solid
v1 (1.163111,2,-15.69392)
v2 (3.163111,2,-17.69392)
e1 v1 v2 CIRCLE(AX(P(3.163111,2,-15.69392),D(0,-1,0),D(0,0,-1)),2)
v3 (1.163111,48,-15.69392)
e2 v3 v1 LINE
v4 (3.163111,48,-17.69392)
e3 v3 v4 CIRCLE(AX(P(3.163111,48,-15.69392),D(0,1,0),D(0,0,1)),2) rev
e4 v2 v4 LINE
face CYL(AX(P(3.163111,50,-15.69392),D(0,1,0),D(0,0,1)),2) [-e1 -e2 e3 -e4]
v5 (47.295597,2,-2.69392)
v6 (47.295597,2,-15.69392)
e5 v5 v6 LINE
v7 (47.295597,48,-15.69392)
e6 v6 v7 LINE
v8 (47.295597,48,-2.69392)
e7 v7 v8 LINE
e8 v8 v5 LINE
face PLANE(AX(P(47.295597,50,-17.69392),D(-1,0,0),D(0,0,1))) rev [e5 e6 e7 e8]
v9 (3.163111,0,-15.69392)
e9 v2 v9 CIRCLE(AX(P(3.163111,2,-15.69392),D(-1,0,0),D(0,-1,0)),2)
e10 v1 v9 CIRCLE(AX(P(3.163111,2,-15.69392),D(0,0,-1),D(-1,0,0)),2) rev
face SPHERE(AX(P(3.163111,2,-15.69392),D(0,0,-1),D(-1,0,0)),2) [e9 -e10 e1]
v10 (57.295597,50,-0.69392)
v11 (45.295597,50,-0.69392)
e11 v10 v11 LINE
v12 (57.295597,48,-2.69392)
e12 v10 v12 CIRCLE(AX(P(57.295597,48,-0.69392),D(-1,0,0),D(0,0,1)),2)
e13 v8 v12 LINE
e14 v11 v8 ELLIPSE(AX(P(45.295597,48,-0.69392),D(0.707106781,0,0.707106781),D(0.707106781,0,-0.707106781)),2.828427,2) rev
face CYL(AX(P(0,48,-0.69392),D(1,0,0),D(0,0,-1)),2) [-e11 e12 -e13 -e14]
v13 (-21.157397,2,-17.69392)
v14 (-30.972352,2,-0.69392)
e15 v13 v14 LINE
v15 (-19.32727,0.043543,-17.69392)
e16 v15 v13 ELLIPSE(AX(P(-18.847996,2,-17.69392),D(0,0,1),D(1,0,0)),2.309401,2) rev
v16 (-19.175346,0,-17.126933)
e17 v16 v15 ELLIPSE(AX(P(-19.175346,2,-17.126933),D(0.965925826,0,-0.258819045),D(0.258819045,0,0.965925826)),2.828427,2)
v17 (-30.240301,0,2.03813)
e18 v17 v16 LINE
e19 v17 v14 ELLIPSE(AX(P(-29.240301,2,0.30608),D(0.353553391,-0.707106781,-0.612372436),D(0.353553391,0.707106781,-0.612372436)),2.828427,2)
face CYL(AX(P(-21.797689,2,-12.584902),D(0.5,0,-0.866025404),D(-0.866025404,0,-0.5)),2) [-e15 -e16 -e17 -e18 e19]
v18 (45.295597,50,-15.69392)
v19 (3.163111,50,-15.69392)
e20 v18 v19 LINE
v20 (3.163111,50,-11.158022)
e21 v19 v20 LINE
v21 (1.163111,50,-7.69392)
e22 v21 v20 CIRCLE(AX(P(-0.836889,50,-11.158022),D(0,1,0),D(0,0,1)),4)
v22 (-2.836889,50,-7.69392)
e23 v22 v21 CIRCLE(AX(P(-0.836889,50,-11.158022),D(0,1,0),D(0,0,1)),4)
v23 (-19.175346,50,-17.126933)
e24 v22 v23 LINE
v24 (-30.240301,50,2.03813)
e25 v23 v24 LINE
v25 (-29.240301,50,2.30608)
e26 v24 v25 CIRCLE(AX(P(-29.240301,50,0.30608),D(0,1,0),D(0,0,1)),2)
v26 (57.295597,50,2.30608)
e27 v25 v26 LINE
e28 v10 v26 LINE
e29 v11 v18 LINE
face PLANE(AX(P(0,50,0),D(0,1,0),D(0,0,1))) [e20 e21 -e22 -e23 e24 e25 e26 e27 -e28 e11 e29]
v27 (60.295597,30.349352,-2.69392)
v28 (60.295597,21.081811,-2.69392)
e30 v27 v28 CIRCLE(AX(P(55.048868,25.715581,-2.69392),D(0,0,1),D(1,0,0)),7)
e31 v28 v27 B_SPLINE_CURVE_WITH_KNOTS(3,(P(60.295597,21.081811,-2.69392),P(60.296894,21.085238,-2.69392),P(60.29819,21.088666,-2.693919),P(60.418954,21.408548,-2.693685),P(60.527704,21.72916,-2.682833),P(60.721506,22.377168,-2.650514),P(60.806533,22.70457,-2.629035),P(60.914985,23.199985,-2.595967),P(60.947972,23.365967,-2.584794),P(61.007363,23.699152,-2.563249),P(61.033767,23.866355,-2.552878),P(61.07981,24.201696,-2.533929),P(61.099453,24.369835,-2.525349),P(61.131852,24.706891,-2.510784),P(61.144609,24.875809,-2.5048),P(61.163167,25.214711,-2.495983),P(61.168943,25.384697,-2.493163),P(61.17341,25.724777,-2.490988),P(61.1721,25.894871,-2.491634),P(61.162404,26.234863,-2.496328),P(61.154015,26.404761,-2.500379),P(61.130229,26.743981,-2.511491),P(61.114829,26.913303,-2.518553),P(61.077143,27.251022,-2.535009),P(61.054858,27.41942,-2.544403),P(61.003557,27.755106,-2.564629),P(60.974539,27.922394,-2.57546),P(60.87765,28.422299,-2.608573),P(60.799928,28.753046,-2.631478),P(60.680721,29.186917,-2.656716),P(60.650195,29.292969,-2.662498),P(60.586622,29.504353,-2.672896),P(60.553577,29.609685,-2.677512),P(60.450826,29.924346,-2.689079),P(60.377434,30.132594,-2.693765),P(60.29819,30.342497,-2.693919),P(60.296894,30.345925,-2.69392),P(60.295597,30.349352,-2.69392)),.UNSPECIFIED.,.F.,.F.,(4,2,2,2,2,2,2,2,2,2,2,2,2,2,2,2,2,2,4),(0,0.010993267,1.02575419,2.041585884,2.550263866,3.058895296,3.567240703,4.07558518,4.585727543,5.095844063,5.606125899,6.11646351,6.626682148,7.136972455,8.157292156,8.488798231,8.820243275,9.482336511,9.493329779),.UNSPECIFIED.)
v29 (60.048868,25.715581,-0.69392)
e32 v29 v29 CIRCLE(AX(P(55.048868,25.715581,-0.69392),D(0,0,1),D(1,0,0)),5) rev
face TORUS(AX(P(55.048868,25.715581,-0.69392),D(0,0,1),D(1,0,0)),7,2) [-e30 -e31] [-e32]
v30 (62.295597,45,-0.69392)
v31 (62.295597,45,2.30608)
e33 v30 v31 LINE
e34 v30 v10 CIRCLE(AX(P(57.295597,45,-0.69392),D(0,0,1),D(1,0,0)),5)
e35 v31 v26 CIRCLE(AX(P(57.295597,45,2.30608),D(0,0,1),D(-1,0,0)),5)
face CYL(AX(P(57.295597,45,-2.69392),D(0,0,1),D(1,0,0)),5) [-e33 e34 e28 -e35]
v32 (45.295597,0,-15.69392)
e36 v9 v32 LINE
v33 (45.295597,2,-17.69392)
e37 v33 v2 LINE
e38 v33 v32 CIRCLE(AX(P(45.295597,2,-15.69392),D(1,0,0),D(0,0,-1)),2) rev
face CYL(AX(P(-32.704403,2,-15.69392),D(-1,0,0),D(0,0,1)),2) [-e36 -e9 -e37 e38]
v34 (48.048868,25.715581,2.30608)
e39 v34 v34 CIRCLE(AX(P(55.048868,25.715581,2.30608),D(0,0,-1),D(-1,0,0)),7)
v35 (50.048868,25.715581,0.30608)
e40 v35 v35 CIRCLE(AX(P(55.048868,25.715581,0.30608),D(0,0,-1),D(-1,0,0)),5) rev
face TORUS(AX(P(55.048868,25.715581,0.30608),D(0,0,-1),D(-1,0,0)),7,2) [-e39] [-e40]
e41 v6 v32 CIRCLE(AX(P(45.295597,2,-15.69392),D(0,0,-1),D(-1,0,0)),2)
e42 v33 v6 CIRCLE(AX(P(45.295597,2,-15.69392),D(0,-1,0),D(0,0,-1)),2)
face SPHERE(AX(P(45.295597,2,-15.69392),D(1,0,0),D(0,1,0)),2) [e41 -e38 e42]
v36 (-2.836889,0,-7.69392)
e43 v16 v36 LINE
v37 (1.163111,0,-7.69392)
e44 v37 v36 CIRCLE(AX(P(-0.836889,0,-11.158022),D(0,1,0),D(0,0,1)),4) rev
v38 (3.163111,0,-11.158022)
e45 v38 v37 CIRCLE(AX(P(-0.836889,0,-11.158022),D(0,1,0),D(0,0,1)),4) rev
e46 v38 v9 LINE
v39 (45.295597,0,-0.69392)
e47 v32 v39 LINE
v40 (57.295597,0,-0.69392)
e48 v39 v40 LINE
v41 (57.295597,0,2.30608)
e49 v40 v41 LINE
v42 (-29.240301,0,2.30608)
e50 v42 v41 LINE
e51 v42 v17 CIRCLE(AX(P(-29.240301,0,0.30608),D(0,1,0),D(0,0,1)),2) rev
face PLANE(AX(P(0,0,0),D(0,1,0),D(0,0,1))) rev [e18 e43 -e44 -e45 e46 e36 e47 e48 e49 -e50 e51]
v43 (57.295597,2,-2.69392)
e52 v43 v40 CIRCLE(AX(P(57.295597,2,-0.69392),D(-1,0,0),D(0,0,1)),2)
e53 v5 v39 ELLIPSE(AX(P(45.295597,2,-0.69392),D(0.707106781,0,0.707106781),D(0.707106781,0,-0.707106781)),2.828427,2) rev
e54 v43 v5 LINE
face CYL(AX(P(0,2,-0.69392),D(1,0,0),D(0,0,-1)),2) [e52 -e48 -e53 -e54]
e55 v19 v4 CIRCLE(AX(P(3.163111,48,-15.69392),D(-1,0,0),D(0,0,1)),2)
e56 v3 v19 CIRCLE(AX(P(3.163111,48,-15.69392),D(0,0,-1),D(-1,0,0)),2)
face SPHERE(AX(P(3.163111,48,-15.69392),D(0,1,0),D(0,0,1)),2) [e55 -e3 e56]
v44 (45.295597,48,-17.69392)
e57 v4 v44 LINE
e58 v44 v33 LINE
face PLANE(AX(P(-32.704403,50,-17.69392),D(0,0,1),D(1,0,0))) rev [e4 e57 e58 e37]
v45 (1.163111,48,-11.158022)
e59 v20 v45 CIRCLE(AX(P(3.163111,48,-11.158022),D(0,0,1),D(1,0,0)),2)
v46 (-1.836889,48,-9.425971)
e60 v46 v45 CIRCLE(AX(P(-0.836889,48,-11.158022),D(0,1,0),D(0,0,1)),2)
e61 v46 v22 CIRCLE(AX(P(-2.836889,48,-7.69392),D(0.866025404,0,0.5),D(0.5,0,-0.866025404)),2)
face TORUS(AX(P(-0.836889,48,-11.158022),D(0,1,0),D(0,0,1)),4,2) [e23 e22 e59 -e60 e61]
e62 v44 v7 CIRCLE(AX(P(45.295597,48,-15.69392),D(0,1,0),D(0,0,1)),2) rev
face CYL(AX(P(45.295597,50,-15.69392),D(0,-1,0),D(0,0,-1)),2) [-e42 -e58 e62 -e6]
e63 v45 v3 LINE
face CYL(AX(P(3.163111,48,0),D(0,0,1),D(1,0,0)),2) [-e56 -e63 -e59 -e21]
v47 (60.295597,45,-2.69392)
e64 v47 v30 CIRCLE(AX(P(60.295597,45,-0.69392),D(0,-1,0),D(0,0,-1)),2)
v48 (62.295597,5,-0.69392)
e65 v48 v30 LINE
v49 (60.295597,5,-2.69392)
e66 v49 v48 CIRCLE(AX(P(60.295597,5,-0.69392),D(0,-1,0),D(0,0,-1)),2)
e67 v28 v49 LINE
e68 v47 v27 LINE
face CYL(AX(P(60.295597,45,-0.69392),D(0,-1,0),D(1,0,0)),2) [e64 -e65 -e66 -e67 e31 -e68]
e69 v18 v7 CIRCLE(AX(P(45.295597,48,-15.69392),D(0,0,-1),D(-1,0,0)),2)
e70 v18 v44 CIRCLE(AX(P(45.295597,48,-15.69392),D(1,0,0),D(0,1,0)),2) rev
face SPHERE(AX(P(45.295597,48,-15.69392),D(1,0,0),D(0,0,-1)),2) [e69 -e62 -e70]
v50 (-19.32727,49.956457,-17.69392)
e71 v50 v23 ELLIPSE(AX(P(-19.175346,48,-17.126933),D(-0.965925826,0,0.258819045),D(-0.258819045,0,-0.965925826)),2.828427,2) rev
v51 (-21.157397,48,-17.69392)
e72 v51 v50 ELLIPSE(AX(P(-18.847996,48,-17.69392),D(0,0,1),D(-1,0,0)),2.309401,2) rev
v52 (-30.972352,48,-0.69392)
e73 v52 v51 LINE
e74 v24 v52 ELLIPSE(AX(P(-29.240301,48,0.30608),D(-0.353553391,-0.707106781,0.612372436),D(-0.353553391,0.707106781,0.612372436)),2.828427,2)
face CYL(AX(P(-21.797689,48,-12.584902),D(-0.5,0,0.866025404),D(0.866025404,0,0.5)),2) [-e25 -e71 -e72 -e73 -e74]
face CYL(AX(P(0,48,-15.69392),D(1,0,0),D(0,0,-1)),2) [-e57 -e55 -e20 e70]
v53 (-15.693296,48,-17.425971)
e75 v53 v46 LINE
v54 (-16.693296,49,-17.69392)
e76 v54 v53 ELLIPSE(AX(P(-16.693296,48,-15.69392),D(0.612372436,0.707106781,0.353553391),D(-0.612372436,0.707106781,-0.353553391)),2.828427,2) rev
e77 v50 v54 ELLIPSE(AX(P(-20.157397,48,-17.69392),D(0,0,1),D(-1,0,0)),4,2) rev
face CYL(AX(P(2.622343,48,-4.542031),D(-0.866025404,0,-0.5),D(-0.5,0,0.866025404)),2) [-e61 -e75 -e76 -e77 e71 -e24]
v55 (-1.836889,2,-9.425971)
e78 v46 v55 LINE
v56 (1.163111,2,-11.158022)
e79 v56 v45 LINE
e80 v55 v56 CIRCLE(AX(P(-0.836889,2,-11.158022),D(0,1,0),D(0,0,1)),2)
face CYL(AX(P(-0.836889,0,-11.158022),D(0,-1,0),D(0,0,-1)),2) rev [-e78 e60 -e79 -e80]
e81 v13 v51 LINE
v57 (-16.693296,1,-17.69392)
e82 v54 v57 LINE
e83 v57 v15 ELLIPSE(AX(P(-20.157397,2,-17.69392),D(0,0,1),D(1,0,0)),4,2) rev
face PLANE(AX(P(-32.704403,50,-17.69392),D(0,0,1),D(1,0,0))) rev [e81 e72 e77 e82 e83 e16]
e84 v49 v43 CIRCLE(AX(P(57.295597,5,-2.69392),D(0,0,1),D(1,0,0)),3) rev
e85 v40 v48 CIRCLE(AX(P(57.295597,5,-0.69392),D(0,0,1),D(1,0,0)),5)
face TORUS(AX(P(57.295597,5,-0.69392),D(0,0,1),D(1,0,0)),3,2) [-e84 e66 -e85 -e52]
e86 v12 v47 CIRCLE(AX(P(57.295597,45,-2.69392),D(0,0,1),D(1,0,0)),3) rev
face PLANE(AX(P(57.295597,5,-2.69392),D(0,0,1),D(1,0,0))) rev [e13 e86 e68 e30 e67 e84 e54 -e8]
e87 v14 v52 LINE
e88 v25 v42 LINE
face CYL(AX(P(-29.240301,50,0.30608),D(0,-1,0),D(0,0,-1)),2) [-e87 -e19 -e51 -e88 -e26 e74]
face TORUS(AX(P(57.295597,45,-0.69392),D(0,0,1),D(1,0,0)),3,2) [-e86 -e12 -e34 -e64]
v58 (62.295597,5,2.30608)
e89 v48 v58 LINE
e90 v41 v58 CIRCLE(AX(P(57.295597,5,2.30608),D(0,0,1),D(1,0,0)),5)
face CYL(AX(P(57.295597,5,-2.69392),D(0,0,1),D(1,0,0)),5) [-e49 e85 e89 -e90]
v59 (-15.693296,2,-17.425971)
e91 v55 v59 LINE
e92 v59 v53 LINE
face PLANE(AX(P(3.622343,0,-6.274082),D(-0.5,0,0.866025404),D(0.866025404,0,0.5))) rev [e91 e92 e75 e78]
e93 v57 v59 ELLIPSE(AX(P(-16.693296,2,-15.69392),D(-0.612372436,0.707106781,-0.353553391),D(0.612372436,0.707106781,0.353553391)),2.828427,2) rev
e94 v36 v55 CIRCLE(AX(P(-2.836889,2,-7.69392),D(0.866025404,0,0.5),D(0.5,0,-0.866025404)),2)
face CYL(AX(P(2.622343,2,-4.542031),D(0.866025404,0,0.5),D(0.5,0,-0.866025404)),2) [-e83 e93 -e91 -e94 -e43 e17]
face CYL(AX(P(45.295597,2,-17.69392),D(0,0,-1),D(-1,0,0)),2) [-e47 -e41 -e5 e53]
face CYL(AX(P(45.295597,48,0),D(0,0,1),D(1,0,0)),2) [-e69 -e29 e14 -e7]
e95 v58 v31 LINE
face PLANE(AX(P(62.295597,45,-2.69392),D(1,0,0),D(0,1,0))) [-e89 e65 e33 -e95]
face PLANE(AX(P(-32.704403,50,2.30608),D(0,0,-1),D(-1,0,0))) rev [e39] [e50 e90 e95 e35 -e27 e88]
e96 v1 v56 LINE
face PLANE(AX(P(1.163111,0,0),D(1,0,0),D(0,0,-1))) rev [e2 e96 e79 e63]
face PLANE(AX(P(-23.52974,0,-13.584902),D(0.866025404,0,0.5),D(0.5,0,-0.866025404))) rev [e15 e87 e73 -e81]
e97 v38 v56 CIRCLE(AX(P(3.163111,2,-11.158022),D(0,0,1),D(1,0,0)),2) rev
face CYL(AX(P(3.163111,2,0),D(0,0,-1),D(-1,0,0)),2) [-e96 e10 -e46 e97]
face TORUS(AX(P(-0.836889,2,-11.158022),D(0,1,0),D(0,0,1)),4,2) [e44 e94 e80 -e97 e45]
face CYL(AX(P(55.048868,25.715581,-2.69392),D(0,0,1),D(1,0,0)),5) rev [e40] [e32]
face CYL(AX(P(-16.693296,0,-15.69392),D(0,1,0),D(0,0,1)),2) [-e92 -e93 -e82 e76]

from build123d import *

# Parameters (mm, degrees)
SKETCH2_W           = 80
SKETCH2_H           = 20
BOSS_EXTRUDE1_DEPTH = 50
CUT_EXTRUDE1_DEPTH  = 50
SKETCH5_R           = 5
BOSS_EXTRUDE2_DEPTH = 5
FILLET1_R           = 2


with BuildPart() as part:
    # Sketch2 → Boss-Extrude1 (new body)
    with BuildSketch(Plane(origin=(0, 0, 0), x_dir=(1, 0, 0), z_dir=(0, 1, 0))):
        with Locations((7.295597484, 7.693920335)):
            Rectangle(SKETCH2_W, SKETCH2_H)
    extrude(amount=BOSS_EXTRUDE1_DEPTH)

    # Sketch3 → Cut-Extrude1 (cut)
    with BuildSketch(Plane(origin=(0, 50, 0), x_dir=(1, 0, 0), z_dir=(0, 1, 0))):
        Polygon((-32.704402516, 17.693920335), (-32.704402516, -2.306079665), (-21.157397132, 17.693920335), align=None)
        Polygon((1.163110944, 17.693920335), (-16.157397132, 17.693920335), (1.163110944, 7.693920335), align=None)
    extrude(amount=-CUT_EXTRUDE1_DEPTH, mode=Mode.SUBTRACT)

    # Sketch5 → Boss-Extrude2 (add)
    with BuildSketch(Plane.XY.offset(2.306079665)):
        with BuildLine():
            Line((47.295597484, 50), (57.295597484, 50))
            ThreePointArc((57.295597484, 50), (60.83113139, 48.535533906), (62.295597484, 45))
            Line((62.295597484, 45), (62.295597484, 5))
            ThreePointArc((62.295597484, 5), (60.83113139, 1.464466094), (57.295597484, 0))
            Line((57.295597484, 0), (47.295597484, 0))
            Line((47.295597484, 0), (47.295597484, 50))
        make_face()
        with Locations((55.048868237, 25.715581395)):
            Circle(SKETCH5_R, mode=Mode.SUBTRACT)
    extrude(amount=-BOSS_EXTRUDE2_DEPTH)

    # Fillet1
    # the kernel refuses this fillet: 2 mm, written as the material it adds along each edge
    with BuildSketch(Plane(origin=(1.163110944, 50, -7.693920335), x_dir=(0, 0, -1), z_dir=(0, -1, 0))) as fillet1_piece_1:
        with BuildLine():
            CenterArc((FILLET1_R * 1.73205080757, -FILLET1_R), FILLET1_R, 90, 120)
            Line((FILLET1_R * 0.866025403784, -FILLET1_R * 1.5), (0, 0))
            Line((0, 0), (FILLET1_R * 1.73205080757, 0))
        make_face()
    extrude(amount=50)
    # the kernel refuses this fillet: 2 mm, written as the material it takes off along each edge
    with BuildSketch(Plane(origin=(3.163110944, 2, -15.693920335), x_dir=(-1, 0, 0), z_dir=(0, -1, 0))) as fillet1_2_piece_1_section:
        Polygon((0, 0), (FILLET1_R, 0), (FILLET1_R, FILLET1_R), (0, FILLET1_R), align=None)
    fillet1_2_piece_1 = extrude(amount=FILLET1_R, mode=Mode.PRIVATE)
    fillet1_2_piece_1 = fillet1_2_piece_1 - Plane(origin=(3.163110944, 2, -15.693920335), x_dir=(0.7071067811865475, 0, 0.7071067811865475), z_dir=(0, -1, 0)) * Sphere(FILLET1_R, mode=Mode.PRIVATE)
    add(fillet1_2_piece_1, mode=Mode.SUBTRACT)
    with BuildSketch(Plane(origin=(3.163110944, 48, -15.693920335), x_dir=(-1, 0, 0), z_dir=(0, 1, 0))) as fillet1_2_piece_2_section:
        Polygon((0, 0), (FILLET1_R, 0), (FILLET1_R, -FILLET1_R), (0, -FILLET1_R), align=None)
    fillet1_2_piece_2 = extrude(amount=FILLET1_R, mode=Mode.PRIVATE)
    fillet1_2_piece_2 = fillet1_2_piece_2 - Plane(origin=(3.163110944, 48, -15.693920335), x_dir=(0.7071067811865475, 0, 0.7071067811865475), z_dir=(0, 1, 0)) * Sphere(FILLET1_R, mode=Mode.PRIVATE)
    add(fillet1_2_piece_2, mode=Mode.SUBTRACT)
    with BuildSketch(Plane(origin=(45.295597484, 2, -15.693920335), x_dir=(0, 0, -1), z_dir=(0, -1, 0))) as fillet1_2_piece_3_section:
        Polygon((0, 0), (FILLET1_R, 0), (FILLET1_R, FILLET1_R), (0, FILLET1_R), align=None)
    fillet1_2_piece_3 = extrude(amount=FILLET1_R, mode=Mode.PRIVATE)
    fillet1_2_piece_3 = fillet1_2_piece_3 - Plane(origin=(45.295597484, 2, -15.693920335), x_dir=(-0.7071067811865474, 0, 0.7071067811865477), z_dir=(0, -1, 0)) * Sphere(FILLET1_R, mode=Mode.PRIVATE)
    add(fillet1_2_piece_3, mode=Mode.SUBTRACT)
    with BuildSketch(Plane(origin=(45.295597484, 48, -15.693920335), x_dir=(0, 0, -1), z_dir=(0, 1, 0))) as fillet1_2_piece_4_section:
        Polygon((0, 0), (FILLET1_R, 0), (FILLET1_R, -FILLET1_R), (0, -FILLET1_R), align=None)
    fillet1_2_piece_4 = extrude(amount=FILLET1_R, mode=Mode.PRIVATE)
    fillet1_2_piece_4 = fillet1_2_piece_4 - Plane(origin=(45.295597484, 48, -15.693920335), x_dir=(-0.7071067811865474, 0, 0.7071067811865477), z_dir=(0, 1, 0)) * Sphere(FILLET1_R, mode=Mode.PRIVATE)
    add(fillet1_2_piece_4, mode=Mode.SUBTRACT)
    with BuildSketch(Plane(origin=(1.163110944, 0, -11.158021951), x_dir=(1, 0, 0), z_dir=(0, 0, -1))) as fillet1_2_piece_5:
        with BuildLine():
            CenterArc((FILLET1_R, -FILLET1_R), FILLET1_R, 90, 90)
            Line((0, -FILLET1_R), (0, 0))
            Line((0, 0), (FILLET1_R, 0))
        make_face()
    extrude(amount=4.535898385, mode=Mode.SUBTRACT)
    with BuildSketch(Plane(origin=(1.163110944, 50, -11.158021951), x_dir=(1, 0, 0), z_dir=(0, 0, -1))) as fillet1_2_piece_6:
        with BuildLine():
            CenterArc((FILLET1_R, FILLET1_R), FILLET1_R, 180, 90)
            Line((0, FILLET1_R), (0, 0))
            Line((0, 0), (FILLET1_R, 0))
        make_face()
    extrude(amount=4.535898385, mode=Mode.SUBTRACT)
    with BuildSketch(Plane(origin=(57.295597484, 0, -2.693920335), x_dir=(0, 0, 1), z_dir=(-1, 0, 0)), Plane(origin=(47.295597484, 50, -2.693920335), x_dir=(0, 0, 1), z_dir=(1, 0, 0))) as fillet1_2_piece_7:
        with BuildLine():
            CenterArc((FILLET1_R, FILLET1_R), FILLET1_R, 180, 90)
            Line((0, FILLET1_R), (0, 0))
            Line((0, 0), (FILLET1_R, 0))
        make_face()
    extrude(amount=10, mode=Mode.SUBTRACT)
    with BuildSketch(Plane(origin=(57.295597484, 5, -2.693920335), x_dir=(1, 0, 0), z_dir=(0, 1, 0))) as fillet1_2_piece_8:
        with BuildLine():
            CenterArc((5 - FILLET1_R, -FILLET1_R), FILLET1_R, 0, 90)
            Line((5, -FILLET1_R), (5, 0))
            Line((5, 0), (5 - FILLET1_R, 0))
        make_face()
    revolve(axis=Axis((57.295597484, 5, -2.693920335), (0, 0, -1)), revolution_arc=90, mode=Mode.SUBTRACT)
    with BuildSketch(Plane(origin=(62.295597484, 45, -2.693920335), x_dir=(-1, 0, 0), z_dir=(0, -1, 0))) as fillet1_2_piece_9:
        with BuildLine():
            CenterArc((FILLET1_R, -FILLET1_R), FILLET1_R, 90, 90)
            Line((0, -FILLET1_R), (0, 0))
            Line((0, 0), (FILLET1_R, 0))
        make_face()
    extrude(amount=40, mode=Mode.SUBTRACT)
    with BuildSketch(Plane(origin=(57.295597484, 45, -2.693920335), x_dir=(0, 1, 0), z_dir=(-1, 0, 0))) as fillet1_2_piece_10:
        with BuildLine():
            CenterArc((5 - FILLET1_R, -FILLET1_R), FILLET1_R, 0, 90)
            Line((5, -FILLET1_R), (5, 0))
            Line((5, 0), (5 - FILLET1_R, 0))
        make_face()
    revolve(axis=Axis((57.295597484, 45, -2.693920335), (0, 0, -1)), revolution_arc=90, mode=Mode.SUBTRACT)
    with BuildSketch(Plane(origin=(47.295597484, 2, -17.693920335), x_dir=(-1, 0, 0), z_dir=(0, 1, 0))) as fillet1_2_piece_11:
        with BuildLine():
            CenterArc((FILLET1_R, FILLET1_R), FILLET1_R, 180, 90)
            Line((0, FILLET1_R), (0, 0))
            Line((0, 0), (FILLET1_R, 0))
        make_face()
    extrude(amount=46, mode=Mode.SUBTRACT)
    with BuildSketch(Plane(origin=(3.163110944, 50, -17.693920335), x_dir=(0, 0, 1), z_dir=(1, 0, 0))) as fillet1_2_piece_12:
        with BuildLine():
            CenterArc((FILLET1_R, FILLET1_R), FILLET1_R, 180, 90)
            Line((0, FILLET1_R), (0, 0))
            Line((0, 0), (FILLET1_R, 0))
        make_face()
    extrude(amount=42.132486541, mode=Mode.SUBTRACT)
    with BuildSketch(Plane(origin=(1.163110944, 48, -17.693920335), x_dir=(0, 0, 1), z_dir=(0, -1, 0))) as fillet1_2_piece_13:
        with BuildLine():
            CenterArc((FILLET1_R, -FILLET1_R), FILLET1_R, 90, 90)
            Line((0, -FILLET1_R), (0, 0))
            Line((0, 0), (FILLET1_R, 0))
        make_face()
    extrude(amount=46, mode=Mode.SUBTRACT)
    with BuildSketch(Plane(origin=(3.163110944, 0, -17.693920335), x_dir=(0, 0, 1), z_dir=(1, 0, 0))) as fillet1_2_piece_14:
        with BuildLine():
            CenterArc((FILLET1_R, -FILLET1_R), FILLET1_R, 90, 90)
            Line((0, -FILLET1_R), (0, 0))
            Line((0, 0), (FILLET1_R, 0))
        make_face()
    extrude(amount=42.132486541, mode=Mode.SUBTRACT)
    with BuildSketch(Plane(origin=(55.048868237, 25.715581395, 2.306079665), x_dir=(1, 0, 0), z_dir=(0, -1, 0))) as fillet1_2_piece_15:
        with BuildLine():
            CenterArc((5 + FILLET1_R, -FILLET1_R), FILLET1_R, 90, 90)
            Line((5, -FILLET1_R), (5, 0))
            Line((5, 0), (5 + FILLET1_R, 0))
        make_face()
    revolve(axis=Axis((55.048868237, 25.715581395, 2.306079665), (0, 0, 1)), mode=Mode.SUBTRACT)
    with BuildSketch(Plane(origin=(55.048868237, 25.715581395, -2.693920335), x_dir=(1, 0, 0), z_dir=(0, -1, 0))) as fillet1_2_piece_16:
        with BuildLine():
            CenterArc((5 + FILLET1_R, FILLET1_R), FILLET1_R, 180, 90)
            Line((5, FILLET1_R), (5, 0))
            Line((5, 0), (5 + FILLET1_R, 0))
        make_face()
    revolve(axis=Axis((55.048868237, 25.715581395, -2.693920335), (0, 0, 1)), mode=Mode.SUBTRACT)
    with BuildSketch(Plane(origin=(47.295597484, 0, -15.693920335), x_dir=(-1, 0, 0), z_dir=(0, 0, 1))) as fillet1_2_piece_17:
        with BuildLine():
            CenterArc((FILLET1_R, -FILLET1_R), FILLET1_R, 90, 90)
            Line((0, -FILLET1_R), (0, 0))
            Line((0, 0), (FILLET1_R, 0))
        make_face()
    extrude(amount=13, mode=Mode.SUBTRACT)
    with BuildSketch(Plane(origin=(47.295597484, 50, -15.693920335), x_dir=(-1, 0, 0), z_dir=(0, 0, 1))) as fillet1_2_piece_18:
        with BuildLine():
            CenterArc((FILLET1_R, FILLET1_R), FILLET1_R, 180, 90)
            Line((0, FILLET1_R), (0, 0))
            Line((0, 0), (FILLET1_R, 0))
        make_face()
    extrude(amount=13, mode=Mode.SUBTRACT)
    with BuildSketch(Plane(origin=(-20.487524151, 0, -20.193920335), x_dir=(-0.4999999999999946, 0, 0.8660254037844418), z_dir=(0.8660254037844418, 0, 0.4999999999999946)), Plane(origin=(-20.487524151, 50, -20.193920335), x_dir=(0, -1, 0), z_dir=(0.8660254037844418, 0, 0.4999999999999946))) as fillet1_2_piece_19:
        with BuildLine():
            CenterArc((FILLET1_R, -FILLET1_R), FILLET1_R, 90, 90)
            Line((0, -FILLET1_R), (0, 0))
            Line((0, 0), (FILLET1_R, 0))
        make_face()
    extrude(amount=21.535898385, mode=Mode.SUBTRACT)
    with BuildSketch(Plane(origin=(-16.157397132, 51.339745962, -17.693920335), x_dir=(-1, 0, 0), z_dir=(0, -1, 0))) as fillet1_2_piece_20:
        with BuildLine():
            CenterArc((FILLET1_R * 0.267949192431, -FILLET1_R), FILLET1_R, 90, 30)
            Line((-FILLET1_R * 0.232050807569, -FILLET1_R * 0.133974596216), (0, 0))
            Line((0, 0), (FILLET1_R * 0.267949192431, 0))
        make_face()
    extrude(amount=52.679491924, mode=Mode.SUBTRACT)
    with BuildSketch(Plane(origin=(-32.704402516, -8.660254038, 2.306079665), x_dir=(0.49999999999999467, 0, -0.8660254037844417), z_dir=(0, 1, 0))) as fillet1_2_piece_21:
        with BuildLine():
            CenterArc((FILLET1_R * 1.73205080757, -FILLET1_R), FILLET1_R, 90, 120)
            Line((FILLET1_R * 0.866025403784, -FILLET1_R * 1.5), (0, 0))
            Line((0, 0), (FILLET1_R * 1.73205080757, 0))
        make_face()
    extrude(amount=67.320508076, mode=Mode.SUBTRACT)
    with BuildSketch(Plane(origin=(-35.204402516, 0, 6.636206683), x_dir=(0.8660254037844418, 0, 0.49999999999999445), z_dir=(0.4999999999999945, 0, -0.8660254037844419))) as fillet1_2_piece_22:
        with BuildLine():
            CenterArc((FILLET1_R, -FILLET1_R), FILLET1_R, 90, 90)
            Line((0, -FILLET1_R), (0, 0))
            Line((0, 0), (FILLET1_R, 0))
        make_face()
    extrude(amount=33.094010768, mode=Mode.SUBTRACT)
    with BuildSketch(Plane(origin=(-35.204402516, 50, 6.636206683), x_dir=(0.8660254037844418, 0, 0.49999999999999445), z_dir=(0.4999999999999945, 0, -0.8660254037844419))) as fillet1_2_piece_23:
        with BuildLine():
            CenterArc((FILLET1_R, FILLET1_R), FILLET1_R, 180, 90)
            Line((0, FILLET1_R), (0, 0))
            Line((0, 0), (FILLET1_R, 0))
        make_face()
    extrude(amount=33.094010768, mode=Mode.SUBTRACT)
    with BuildSketch(Plane(origin=(-0.836889056, 50, -11.158021951), x_dir=(1, 0, 0), z_dir=(0, 0, -1))) as fillet1_2_piece_24:
        with BuildLine():
            CenterArc((2 + FILLET1_R, FILLET1_R), FILLET1_R, 180, 90)
            Line((2, FILLET1_R), (2, 0))
            Line((2, 0), (2 + FILLET1_R, 0))
        make_face()
    revolve(axis=Axis((-0.836889056, 50, -11.158021951), (0, -1, 0)), revolution_arc=120, mode=Mode.SUBTRACT)
    with BuildSketch(Plane(origin=(-0.836889056, 0, -11.158021951), x_dir=(1, 0, 0), z_dir=(0, 0, -1))) as fillet1_2_piece_25:
        with BuildLine():
            CenterArc((2 + FILLET1_R, -FILLET1_R), FILLET1_R, 90, 90)
            Line((2, -FILLET1_R), (2, 0))
            Line((2, 0), (2 + FILLET1_R, 0))
        make_face()
    revolve(axis=Axis((-0.836889056, 0, -11.158021951), (0, -1, 0)), revolution_arc=120, mode=Mode.SUBTRACT)
    with BuildSketch(Plane(origin=(47.295597484, 0, -15.693920335), x_dir=(-1, 0, 0), z_dir=(0, 0, 1))) as fillet1_2_piece_26a_section:
        with BuildLine():
            CenterArc((FILLET1_R, -FILLET1_R), FILLET1_R, 90, 90)
            Line((0, -FILLET1_R), (0, 0))
            Line((0, 0), (FILLET1_R, 0))
        make_face()
    fillet1_2_piece_26a = extrude(amount=18, mode=Mode.PRIVATE)
    fillet1_2_piece_26a = split(fillet1_2_piece_26a, bisect_by=Plane(origin=(46.842807256, 0.452790229, -2.693920335), z_dir=(0, 0, 1)), keep=Keep.TOP, mode=Mode.PRIVATE)
    with BuildSketch(Plane(origin=(57.295597484, 0, -2.693920335), x_dir=(0, 0, 1), z_dir=(-1, 0, 0))) as fillet1_2_piece_26b_section:
        with BuildLine():
            CenterArc((FILLET1_R, FILLET1_R), FILLET1_R, 180, 90)
            Line((0, FILLET1_R), (0, 0))
            Line((0, 0), (FILLET1_R, 0))
        make_face()
    fillet1_2_piece_26b = extrude(amount=15, mode=Mode.PRIVATE)
    fillet1_2_piece_26b = split(fillet1_2_piece_26b, bisect_by=Plane(origin=(47.295597484, 0.452790229, -2.241130107), z_dir=(-1, 0, 0)), keep=Keep.TOP, mode=Mode.PRIVATE)
    fillet1_2_piece_26 = fillet1_2_piece_26a & fillet1_2_piece_26b
    add(fillet1_2_piece_26, mode=Mode.SUBTRACT)
    with BuildSketch(Plane(origin=(47.295597484, 50, -15.693920335), x_dir=(-1, 0, 0), z_dir=(0, 0, 1))) as fillet1_2_piece_27a_section:
        with BuildLine():
            CenterArc((FILLET1_R, FILLET1_R), FILLET1_R, 180, 90)
            Line((0, FILLET1_R), (0, 0))
            Line((0, 0), (FILLET1_R, 0))
        make_face()
    fillet1_2_piece_27a = extrude(amount=18, mode=Mode.PRIVATE)
    fillet1_2_piece_27a = split(fillet1_2_piece_27a, bisect_by=Plane(origin=(46.842807256, 49.547209771, -2.693920335), z_dir=(0, 0, 1)), keep=Keep.TOP, mode=Mode.PRIVATE)
    with BuildSketch(Plane(origin=(42.295597484, 50, -2.693920335), x_dir=(0, 0, 1), z_dir=(1, 0, 0))) as fillet1_2_piece_27b_section:
        with BuildLine():
            CenterArc((FILLET1_R, FILLET1_R), FILLET1_R, 180, 90)
            Line((0, FILLET1_R), (0, 0))
            Line((0, 0), (FILLET1_R, 0))
        make_face()
    fillet1_2_piece_27b = extrude(amount=15, mode=Mode.PRIVATE)
    fillet1_2_piece_27b = split(fillet1_2_piece_27b, bisect_by=Plane(origin=(47.295597484, 49.547209771, -2.241130107), z_dir=(-1, 0, 0)), keep=Keep.TOP, mode=Mode.PRIVATE)
    fillet1_2_piece_27 = fillet1_2_piece_27a & fillet1_2_piece_27b
    add(fillet1_2_piece_27, mode=Mode.SUBTRACT)


solid = part.part
